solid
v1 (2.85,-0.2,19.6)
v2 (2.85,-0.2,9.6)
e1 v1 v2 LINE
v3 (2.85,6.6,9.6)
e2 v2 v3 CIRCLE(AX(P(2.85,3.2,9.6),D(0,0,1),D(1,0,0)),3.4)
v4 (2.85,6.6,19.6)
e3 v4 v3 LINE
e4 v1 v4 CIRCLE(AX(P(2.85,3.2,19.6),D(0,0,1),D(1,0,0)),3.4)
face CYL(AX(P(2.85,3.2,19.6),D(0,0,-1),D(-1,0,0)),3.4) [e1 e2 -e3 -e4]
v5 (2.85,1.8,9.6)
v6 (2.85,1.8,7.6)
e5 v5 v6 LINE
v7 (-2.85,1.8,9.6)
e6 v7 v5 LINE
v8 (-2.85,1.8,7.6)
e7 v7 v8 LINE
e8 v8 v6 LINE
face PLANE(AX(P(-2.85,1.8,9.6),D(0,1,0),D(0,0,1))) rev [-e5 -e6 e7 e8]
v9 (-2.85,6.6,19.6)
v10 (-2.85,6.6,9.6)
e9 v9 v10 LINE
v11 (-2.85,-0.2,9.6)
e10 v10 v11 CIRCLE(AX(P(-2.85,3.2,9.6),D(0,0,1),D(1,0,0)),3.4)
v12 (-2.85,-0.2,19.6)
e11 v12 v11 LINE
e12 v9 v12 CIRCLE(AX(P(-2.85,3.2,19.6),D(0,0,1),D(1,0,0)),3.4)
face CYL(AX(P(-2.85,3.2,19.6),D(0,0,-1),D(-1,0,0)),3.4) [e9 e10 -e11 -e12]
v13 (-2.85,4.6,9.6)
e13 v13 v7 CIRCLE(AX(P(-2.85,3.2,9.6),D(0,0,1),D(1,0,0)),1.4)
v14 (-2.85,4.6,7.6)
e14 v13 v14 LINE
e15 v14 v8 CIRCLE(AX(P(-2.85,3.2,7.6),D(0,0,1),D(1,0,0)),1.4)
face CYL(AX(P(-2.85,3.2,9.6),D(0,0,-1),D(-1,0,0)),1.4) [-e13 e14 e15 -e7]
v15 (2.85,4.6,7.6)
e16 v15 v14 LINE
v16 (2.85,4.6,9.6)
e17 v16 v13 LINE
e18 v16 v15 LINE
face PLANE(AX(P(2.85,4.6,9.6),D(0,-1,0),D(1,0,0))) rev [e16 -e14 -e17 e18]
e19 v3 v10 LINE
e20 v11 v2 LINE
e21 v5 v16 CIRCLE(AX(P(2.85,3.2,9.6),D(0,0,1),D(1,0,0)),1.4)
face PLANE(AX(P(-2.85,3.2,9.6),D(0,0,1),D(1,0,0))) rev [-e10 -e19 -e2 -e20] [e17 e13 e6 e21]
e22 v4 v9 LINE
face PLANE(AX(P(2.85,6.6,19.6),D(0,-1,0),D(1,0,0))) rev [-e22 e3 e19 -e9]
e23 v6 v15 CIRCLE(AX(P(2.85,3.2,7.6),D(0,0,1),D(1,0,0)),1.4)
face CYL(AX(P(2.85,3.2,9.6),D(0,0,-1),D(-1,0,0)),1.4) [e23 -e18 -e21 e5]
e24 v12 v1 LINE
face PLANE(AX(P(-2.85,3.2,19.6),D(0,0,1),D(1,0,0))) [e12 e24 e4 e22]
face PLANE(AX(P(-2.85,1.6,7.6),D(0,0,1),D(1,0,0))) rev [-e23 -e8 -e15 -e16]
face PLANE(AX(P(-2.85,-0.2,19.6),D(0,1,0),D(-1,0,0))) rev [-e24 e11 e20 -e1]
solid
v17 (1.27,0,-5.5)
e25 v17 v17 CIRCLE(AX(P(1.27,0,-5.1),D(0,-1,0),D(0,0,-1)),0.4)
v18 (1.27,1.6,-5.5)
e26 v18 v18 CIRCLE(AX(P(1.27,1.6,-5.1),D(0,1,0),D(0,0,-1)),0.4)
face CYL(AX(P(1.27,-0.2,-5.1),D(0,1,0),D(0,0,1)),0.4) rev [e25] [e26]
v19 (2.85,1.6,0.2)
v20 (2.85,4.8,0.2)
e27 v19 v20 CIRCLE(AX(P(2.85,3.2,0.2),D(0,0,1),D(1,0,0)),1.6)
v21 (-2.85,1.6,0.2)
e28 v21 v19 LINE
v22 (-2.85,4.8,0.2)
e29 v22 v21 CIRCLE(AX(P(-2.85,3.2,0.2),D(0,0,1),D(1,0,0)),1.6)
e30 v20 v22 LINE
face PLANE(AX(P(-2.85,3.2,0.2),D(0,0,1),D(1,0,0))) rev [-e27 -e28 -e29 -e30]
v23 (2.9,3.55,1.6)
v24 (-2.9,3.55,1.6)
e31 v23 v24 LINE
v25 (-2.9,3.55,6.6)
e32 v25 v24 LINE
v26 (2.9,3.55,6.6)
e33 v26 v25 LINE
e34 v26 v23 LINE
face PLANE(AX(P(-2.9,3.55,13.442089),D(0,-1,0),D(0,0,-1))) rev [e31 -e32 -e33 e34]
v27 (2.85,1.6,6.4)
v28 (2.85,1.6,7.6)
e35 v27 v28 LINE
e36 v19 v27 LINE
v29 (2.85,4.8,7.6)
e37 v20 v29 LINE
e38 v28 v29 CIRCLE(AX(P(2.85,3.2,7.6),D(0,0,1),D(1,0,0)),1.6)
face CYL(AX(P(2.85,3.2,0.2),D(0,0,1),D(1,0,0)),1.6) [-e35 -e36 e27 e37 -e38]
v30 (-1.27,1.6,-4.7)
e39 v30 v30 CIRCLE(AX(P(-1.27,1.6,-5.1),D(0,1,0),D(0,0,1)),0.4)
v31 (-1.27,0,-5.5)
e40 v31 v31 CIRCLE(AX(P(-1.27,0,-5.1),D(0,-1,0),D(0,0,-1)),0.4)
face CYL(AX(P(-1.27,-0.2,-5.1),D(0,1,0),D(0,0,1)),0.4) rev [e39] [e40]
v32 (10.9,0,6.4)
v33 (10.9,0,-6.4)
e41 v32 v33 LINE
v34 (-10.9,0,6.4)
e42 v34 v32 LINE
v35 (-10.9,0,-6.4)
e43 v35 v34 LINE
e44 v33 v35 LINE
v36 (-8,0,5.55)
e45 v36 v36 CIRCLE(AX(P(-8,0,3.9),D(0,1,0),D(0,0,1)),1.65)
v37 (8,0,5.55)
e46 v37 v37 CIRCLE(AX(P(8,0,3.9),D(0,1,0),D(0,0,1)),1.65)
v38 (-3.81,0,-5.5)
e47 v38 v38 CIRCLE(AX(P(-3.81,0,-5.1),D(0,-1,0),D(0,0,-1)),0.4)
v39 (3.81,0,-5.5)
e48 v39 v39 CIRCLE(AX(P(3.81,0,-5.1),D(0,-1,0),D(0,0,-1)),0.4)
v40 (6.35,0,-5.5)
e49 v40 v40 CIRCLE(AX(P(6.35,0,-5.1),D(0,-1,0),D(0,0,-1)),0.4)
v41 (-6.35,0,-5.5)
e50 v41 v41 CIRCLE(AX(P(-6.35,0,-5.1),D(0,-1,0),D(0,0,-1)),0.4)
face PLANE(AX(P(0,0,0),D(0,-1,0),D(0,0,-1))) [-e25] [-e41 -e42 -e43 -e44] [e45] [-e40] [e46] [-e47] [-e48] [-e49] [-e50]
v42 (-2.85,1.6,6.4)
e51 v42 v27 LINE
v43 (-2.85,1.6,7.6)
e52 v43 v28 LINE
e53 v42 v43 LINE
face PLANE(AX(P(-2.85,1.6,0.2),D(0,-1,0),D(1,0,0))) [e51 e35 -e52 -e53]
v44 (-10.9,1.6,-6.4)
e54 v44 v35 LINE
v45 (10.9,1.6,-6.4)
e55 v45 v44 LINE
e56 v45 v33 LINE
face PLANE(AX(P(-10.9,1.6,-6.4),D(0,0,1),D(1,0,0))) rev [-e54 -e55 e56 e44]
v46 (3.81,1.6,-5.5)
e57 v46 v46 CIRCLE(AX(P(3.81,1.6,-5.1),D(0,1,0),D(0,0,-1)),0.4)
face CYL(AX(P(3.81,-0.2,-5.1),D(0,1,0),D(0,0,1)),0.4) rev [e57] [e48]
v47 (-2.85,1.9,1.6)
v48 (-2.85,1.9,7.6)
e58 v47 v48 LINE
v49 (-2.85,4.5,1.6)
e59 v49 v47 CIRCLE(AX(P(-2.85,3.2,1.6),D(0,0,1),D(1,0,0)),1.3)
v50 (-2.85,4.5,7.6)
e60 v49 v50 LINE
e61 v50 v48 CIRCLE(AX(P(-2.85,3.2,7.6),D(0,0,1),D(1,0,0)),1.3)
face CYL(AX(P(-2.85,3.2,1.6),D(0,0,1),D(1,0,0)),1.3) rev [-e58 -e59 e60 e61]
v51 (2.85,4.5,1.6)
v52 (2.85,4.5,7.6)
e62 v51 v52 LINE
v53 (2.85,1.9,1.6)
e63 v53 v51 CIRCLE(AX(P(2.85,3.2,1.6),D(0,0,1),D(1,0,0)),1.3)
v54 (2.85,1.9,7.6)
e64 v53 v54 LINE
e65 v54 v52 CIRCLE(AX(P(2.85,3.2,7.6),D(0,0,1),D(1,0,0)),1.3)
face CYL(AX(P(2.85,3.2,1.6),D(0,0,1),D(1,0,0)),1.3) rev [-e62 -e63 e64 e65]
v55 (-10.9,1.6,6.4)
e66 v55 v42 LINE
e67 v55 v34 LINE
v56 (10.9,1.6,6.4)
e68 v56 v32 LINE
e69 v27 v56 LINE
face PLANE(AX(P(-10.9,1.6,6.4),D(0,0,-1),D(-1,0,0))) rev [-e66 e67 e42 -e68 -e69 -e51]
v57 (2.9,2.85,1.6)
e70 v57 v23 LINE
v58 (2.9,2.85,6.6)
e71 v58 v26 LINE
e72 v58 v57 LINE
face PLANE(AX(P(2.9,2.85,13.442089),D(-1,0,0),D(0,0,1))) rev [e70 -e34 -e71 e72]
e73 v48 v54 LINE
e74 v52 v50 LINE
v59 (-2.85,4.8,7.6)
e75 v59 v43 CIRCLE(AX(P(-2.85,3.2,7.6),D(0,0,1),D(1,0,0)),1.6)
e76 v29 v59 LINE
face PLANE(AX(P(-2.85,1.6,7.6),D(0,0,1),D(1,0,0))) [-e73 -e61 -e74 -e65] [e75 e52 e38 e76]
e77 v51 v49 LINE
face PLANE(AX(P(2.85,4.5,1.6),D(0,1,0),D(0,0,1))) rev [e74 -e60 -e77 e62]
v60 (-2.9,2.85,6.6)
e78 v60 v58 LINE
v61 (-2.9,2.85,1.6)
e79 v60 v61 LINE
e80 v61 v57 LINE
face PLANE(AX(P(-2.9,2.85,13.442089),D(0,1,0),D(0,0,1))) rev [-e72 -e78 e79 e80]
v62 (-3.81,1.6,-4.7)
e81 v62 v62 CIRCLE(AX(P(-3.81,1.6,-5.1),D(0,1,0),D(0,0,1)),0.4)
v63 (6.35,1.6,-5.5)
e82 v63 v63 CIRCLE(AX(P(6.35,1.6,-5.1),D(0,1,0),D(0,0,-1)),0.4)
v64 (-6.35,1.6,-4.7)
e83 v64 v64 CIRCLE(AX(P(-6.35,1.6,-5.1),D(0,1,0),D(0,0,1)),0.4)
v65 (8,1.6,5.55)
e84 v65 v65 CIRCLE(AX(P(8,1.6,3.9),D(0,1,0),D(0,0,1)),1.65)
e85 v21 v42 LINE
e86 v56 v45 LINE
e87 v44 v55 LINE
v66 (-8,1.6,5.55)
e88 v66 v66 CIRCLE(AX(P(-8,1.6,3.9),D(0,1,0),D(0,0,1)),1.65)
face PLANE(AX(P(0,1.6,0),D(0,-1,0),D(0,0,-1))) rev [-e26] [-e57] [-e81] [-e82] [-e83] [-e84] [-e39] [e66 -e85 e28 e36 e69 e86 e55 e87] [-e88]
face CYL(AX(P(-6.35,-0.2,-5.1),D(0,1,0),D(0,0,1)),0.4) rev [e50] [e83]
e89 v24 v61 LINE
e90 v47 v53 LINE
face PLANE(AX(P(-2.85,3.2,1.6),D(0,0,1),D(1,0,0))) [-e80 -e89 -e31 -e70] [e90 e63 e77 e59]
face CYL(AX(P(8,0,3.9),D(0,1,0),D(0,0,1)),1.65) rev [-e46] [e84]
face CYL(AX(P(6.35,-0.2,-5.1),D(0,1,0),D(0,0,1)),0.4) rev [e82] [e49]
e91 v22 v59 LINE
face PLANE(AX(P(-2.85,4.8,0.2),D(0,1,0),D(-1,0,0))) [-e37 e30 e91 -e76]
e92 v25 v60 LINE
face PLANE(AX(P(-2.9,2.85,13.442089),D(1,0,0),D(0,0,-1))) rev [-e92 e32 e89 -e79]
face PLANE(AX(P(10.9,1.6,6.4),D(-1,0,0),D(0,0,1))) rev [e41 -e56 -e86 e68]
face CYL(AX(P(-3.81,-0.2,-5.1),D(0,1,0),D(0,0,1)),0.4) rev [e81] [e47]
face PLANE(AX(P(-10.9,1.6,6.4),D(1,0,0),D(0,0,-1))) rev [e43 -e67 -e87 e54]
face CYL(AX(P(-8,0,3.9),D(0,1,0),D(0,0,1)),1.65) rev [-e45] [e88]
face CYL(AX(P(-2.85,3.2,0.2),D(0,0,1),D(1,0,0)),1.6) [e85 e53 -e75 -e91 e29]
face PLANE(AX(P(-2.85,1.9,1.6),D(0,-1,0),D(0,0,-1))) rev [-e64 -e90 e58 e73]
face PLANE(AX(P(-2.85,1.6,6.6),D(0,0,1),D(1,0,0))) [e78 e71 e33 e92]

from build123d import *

# Parameters (mm, degrees)
SKETCH1_W           = 21.8
SKETCH1_H           = 12.8
BOSS_EXTRUDE1_DEPTH = 1.6
SKETCH2_R           = 1.65
CUT_EXTRUDE1_DEPTH  = 1.6
BOSS_EXTRUDE2_DEPTH = 7.4
BOSS_EXTRUDE3_DEPTH = 2
BOSS_EXTRUDE4_DEPTH = 10
CUT_EXTRUDE2_DEPTH  = 6
SKETCH7_W           = 5.8
SKETCH7_H           = 0.7
BOSS_EXTRUDE5_DEPTH = 5
SKETCH8_R           = 0.4
CUT_EXTRUDE3_DEPTH  = 23.977597786


# Read off the part's stored shape, not the designer's step: Split1
with BuildPart() as part:
    # Sketch1 → Boss-Extrude1 (new body)
    with BuildSketch(Plane(origin=(0, 0, 0), x_dir=(1, 0, 0), z_dir=(0, 1, 0))):
        Rectangle(SKETCH1_W, SKETCH1_H)
    extrude(amount=BOSS_EXTRUDE1_DEPTH)

    # Sketch2 → Cut-Extrude1 (cut)
    with BuildSketch(Plane(origin=(0, 1.6, 0), x_dir=(1, 0, 0), z_dir=(0, 1, 0))):
        with Locations(Location((-8, -3.9, 0), (0, 0, 270))):
            Circle(SKETCH2_R)
        with Locations(Location((8, -3.9, 0), (0, 0, 270))):
            Circle(SKETCH2_R)
    extrude(amount=-CUT_EXTRUDE1_DEPTH, mode=Mode.SUBTRACT)

    # Sketch3 → Boss-Extrude2 (add)
    with BuildSketch(Plane.XY.offset(7.6)):
        with BuildLine():
            Line((-2.85, 4.8), (2.85, 4.8))
            ThreePointArc((2.85, 4.8), (4.45, 3.2), (2.85, 1.6))
            Line((2.85, 1.6), (-2.85, 1.6))
            ThreePointArc((-2.85, 1.6), (-4.45, 3.2), (-2.85, 4.8))
        make_face()
    extrude(amount=-BOSS_EXTRUDE2_DEPTH)

    # Sketch4 → Boss-Extrude3 (add)
    with BuildSketch(Plane.XY.offset(7.6)):
        with BuildLine():
            Line((-2.85, 1.8), (2.85, 1.8))
            ThreePointArc((2.85, 1.8), (4.25, 3.2), (2.85, 4.6))
            Line((2.85, 4.6), (-2.85, 4.6))
            ThreePointArc((-2.85, 4.6), (-4.25, 3.2), (-2.85, 1.8))
        make_face()
    extrude(amount=BOSS_EXTRUDE3_DEPTH)

    # Sketch5 → Boss-Extrude4 (add)
    with BuildSketch(Plane.XY.offset(9.6)):
        with BuildLine():
            Line((-2.85, -0.2), (2.85, -0.2))
            ThreePointArc((2.85, -0.2), (6.25, 3.2), (2.85, 6.6))
            Line((2.85, 6.6), (-2.85, 6.6))
            ThreePointArc((-2.85, 6.6), (-6.25, 3.2), (-2.85, -0.2))
        make_face()
    extrude(amount=BOSS_EXTRUDE4_DEPTH)


with BuildPart() as body_2:
    # Split1: the piece on the far side of the plane
    add(part.part)
    split(bisect_by=Plane.XY.offset(7.6), keep=Keep.BOTTOM)

    # Sketch6 → Cut-Extrude2 (cut)
    with BuildSketch(Plane.XY.offset(7.6)):
        with BuildLine():
            Line((-2.85, 1.9), (2.85, 1.9))
            ThreePointArc((2.85, 1.9), (4.15, 3.2), (2.85, 4.5))
            Line((2.85, 4.5), (-2.85, 4.5))
            ThreePointArc((-2.85, 4.5), (-4.15, 3.2), (-2.85, 1.9))
        make_face()
    extrude(amount=-CUT_EXTRUDE2_DEPTH, mode=Mode.SUBTRACT)

    # Sketch7 → Boss-Extrude5 (add)
    with BuildSketch(Plane.XY.offset(1.6)):
        with Locations((0, 3.2)):
            Rectangle(SKETCH7_W, SKETCH7_H)
    extrude(amount=BOSS_EXTRUDE5_DEPTH)

    # Sketch8 → Cut-Extrude3 (cut, through all)
    with BuildSketch(Plane(origin=(0, 1.6, 0), x_dir=(1, 0, 0), z_dir=(0, 1, 0))):
        with Locations(Location((-1.27, 5.1, 0), (0, 0, 270))):
            Circle(SKETCH8_R)
        with Locations(Location((-3.81, 5.1, 0), (0, 0, 270))):
            Circle(SKETCH8_R)
        with Locations(Location((-6.35, 5.1, 0), (0, 0, 270))):
            Circle(SKETCH8_R)
        with Locations(Location((1.27, 5.1, 0), (0, 0, 90))):
            Circle(SKETCH8_R)
        with Locations(Location((3.81, 5.1, 0), (0, 0, 90))):
            Circle(SKETCH8_R)
        with Locations(Location((6.35, 5.1, 0), (0, 0, 90))):
            Circle(SKETCH8_R)
    extrude(amount=-CUT_EXTRUDE3_DEPTH, mode=Mode.SUBTRACT)


with BuildPart() as part_1:
    add(part.part)

    # Split1
    split(bisect_by=Plane.XY.offset(7.6), keep=Keep.TOP)


solid = Compound([body_2.part, part_1.part])
